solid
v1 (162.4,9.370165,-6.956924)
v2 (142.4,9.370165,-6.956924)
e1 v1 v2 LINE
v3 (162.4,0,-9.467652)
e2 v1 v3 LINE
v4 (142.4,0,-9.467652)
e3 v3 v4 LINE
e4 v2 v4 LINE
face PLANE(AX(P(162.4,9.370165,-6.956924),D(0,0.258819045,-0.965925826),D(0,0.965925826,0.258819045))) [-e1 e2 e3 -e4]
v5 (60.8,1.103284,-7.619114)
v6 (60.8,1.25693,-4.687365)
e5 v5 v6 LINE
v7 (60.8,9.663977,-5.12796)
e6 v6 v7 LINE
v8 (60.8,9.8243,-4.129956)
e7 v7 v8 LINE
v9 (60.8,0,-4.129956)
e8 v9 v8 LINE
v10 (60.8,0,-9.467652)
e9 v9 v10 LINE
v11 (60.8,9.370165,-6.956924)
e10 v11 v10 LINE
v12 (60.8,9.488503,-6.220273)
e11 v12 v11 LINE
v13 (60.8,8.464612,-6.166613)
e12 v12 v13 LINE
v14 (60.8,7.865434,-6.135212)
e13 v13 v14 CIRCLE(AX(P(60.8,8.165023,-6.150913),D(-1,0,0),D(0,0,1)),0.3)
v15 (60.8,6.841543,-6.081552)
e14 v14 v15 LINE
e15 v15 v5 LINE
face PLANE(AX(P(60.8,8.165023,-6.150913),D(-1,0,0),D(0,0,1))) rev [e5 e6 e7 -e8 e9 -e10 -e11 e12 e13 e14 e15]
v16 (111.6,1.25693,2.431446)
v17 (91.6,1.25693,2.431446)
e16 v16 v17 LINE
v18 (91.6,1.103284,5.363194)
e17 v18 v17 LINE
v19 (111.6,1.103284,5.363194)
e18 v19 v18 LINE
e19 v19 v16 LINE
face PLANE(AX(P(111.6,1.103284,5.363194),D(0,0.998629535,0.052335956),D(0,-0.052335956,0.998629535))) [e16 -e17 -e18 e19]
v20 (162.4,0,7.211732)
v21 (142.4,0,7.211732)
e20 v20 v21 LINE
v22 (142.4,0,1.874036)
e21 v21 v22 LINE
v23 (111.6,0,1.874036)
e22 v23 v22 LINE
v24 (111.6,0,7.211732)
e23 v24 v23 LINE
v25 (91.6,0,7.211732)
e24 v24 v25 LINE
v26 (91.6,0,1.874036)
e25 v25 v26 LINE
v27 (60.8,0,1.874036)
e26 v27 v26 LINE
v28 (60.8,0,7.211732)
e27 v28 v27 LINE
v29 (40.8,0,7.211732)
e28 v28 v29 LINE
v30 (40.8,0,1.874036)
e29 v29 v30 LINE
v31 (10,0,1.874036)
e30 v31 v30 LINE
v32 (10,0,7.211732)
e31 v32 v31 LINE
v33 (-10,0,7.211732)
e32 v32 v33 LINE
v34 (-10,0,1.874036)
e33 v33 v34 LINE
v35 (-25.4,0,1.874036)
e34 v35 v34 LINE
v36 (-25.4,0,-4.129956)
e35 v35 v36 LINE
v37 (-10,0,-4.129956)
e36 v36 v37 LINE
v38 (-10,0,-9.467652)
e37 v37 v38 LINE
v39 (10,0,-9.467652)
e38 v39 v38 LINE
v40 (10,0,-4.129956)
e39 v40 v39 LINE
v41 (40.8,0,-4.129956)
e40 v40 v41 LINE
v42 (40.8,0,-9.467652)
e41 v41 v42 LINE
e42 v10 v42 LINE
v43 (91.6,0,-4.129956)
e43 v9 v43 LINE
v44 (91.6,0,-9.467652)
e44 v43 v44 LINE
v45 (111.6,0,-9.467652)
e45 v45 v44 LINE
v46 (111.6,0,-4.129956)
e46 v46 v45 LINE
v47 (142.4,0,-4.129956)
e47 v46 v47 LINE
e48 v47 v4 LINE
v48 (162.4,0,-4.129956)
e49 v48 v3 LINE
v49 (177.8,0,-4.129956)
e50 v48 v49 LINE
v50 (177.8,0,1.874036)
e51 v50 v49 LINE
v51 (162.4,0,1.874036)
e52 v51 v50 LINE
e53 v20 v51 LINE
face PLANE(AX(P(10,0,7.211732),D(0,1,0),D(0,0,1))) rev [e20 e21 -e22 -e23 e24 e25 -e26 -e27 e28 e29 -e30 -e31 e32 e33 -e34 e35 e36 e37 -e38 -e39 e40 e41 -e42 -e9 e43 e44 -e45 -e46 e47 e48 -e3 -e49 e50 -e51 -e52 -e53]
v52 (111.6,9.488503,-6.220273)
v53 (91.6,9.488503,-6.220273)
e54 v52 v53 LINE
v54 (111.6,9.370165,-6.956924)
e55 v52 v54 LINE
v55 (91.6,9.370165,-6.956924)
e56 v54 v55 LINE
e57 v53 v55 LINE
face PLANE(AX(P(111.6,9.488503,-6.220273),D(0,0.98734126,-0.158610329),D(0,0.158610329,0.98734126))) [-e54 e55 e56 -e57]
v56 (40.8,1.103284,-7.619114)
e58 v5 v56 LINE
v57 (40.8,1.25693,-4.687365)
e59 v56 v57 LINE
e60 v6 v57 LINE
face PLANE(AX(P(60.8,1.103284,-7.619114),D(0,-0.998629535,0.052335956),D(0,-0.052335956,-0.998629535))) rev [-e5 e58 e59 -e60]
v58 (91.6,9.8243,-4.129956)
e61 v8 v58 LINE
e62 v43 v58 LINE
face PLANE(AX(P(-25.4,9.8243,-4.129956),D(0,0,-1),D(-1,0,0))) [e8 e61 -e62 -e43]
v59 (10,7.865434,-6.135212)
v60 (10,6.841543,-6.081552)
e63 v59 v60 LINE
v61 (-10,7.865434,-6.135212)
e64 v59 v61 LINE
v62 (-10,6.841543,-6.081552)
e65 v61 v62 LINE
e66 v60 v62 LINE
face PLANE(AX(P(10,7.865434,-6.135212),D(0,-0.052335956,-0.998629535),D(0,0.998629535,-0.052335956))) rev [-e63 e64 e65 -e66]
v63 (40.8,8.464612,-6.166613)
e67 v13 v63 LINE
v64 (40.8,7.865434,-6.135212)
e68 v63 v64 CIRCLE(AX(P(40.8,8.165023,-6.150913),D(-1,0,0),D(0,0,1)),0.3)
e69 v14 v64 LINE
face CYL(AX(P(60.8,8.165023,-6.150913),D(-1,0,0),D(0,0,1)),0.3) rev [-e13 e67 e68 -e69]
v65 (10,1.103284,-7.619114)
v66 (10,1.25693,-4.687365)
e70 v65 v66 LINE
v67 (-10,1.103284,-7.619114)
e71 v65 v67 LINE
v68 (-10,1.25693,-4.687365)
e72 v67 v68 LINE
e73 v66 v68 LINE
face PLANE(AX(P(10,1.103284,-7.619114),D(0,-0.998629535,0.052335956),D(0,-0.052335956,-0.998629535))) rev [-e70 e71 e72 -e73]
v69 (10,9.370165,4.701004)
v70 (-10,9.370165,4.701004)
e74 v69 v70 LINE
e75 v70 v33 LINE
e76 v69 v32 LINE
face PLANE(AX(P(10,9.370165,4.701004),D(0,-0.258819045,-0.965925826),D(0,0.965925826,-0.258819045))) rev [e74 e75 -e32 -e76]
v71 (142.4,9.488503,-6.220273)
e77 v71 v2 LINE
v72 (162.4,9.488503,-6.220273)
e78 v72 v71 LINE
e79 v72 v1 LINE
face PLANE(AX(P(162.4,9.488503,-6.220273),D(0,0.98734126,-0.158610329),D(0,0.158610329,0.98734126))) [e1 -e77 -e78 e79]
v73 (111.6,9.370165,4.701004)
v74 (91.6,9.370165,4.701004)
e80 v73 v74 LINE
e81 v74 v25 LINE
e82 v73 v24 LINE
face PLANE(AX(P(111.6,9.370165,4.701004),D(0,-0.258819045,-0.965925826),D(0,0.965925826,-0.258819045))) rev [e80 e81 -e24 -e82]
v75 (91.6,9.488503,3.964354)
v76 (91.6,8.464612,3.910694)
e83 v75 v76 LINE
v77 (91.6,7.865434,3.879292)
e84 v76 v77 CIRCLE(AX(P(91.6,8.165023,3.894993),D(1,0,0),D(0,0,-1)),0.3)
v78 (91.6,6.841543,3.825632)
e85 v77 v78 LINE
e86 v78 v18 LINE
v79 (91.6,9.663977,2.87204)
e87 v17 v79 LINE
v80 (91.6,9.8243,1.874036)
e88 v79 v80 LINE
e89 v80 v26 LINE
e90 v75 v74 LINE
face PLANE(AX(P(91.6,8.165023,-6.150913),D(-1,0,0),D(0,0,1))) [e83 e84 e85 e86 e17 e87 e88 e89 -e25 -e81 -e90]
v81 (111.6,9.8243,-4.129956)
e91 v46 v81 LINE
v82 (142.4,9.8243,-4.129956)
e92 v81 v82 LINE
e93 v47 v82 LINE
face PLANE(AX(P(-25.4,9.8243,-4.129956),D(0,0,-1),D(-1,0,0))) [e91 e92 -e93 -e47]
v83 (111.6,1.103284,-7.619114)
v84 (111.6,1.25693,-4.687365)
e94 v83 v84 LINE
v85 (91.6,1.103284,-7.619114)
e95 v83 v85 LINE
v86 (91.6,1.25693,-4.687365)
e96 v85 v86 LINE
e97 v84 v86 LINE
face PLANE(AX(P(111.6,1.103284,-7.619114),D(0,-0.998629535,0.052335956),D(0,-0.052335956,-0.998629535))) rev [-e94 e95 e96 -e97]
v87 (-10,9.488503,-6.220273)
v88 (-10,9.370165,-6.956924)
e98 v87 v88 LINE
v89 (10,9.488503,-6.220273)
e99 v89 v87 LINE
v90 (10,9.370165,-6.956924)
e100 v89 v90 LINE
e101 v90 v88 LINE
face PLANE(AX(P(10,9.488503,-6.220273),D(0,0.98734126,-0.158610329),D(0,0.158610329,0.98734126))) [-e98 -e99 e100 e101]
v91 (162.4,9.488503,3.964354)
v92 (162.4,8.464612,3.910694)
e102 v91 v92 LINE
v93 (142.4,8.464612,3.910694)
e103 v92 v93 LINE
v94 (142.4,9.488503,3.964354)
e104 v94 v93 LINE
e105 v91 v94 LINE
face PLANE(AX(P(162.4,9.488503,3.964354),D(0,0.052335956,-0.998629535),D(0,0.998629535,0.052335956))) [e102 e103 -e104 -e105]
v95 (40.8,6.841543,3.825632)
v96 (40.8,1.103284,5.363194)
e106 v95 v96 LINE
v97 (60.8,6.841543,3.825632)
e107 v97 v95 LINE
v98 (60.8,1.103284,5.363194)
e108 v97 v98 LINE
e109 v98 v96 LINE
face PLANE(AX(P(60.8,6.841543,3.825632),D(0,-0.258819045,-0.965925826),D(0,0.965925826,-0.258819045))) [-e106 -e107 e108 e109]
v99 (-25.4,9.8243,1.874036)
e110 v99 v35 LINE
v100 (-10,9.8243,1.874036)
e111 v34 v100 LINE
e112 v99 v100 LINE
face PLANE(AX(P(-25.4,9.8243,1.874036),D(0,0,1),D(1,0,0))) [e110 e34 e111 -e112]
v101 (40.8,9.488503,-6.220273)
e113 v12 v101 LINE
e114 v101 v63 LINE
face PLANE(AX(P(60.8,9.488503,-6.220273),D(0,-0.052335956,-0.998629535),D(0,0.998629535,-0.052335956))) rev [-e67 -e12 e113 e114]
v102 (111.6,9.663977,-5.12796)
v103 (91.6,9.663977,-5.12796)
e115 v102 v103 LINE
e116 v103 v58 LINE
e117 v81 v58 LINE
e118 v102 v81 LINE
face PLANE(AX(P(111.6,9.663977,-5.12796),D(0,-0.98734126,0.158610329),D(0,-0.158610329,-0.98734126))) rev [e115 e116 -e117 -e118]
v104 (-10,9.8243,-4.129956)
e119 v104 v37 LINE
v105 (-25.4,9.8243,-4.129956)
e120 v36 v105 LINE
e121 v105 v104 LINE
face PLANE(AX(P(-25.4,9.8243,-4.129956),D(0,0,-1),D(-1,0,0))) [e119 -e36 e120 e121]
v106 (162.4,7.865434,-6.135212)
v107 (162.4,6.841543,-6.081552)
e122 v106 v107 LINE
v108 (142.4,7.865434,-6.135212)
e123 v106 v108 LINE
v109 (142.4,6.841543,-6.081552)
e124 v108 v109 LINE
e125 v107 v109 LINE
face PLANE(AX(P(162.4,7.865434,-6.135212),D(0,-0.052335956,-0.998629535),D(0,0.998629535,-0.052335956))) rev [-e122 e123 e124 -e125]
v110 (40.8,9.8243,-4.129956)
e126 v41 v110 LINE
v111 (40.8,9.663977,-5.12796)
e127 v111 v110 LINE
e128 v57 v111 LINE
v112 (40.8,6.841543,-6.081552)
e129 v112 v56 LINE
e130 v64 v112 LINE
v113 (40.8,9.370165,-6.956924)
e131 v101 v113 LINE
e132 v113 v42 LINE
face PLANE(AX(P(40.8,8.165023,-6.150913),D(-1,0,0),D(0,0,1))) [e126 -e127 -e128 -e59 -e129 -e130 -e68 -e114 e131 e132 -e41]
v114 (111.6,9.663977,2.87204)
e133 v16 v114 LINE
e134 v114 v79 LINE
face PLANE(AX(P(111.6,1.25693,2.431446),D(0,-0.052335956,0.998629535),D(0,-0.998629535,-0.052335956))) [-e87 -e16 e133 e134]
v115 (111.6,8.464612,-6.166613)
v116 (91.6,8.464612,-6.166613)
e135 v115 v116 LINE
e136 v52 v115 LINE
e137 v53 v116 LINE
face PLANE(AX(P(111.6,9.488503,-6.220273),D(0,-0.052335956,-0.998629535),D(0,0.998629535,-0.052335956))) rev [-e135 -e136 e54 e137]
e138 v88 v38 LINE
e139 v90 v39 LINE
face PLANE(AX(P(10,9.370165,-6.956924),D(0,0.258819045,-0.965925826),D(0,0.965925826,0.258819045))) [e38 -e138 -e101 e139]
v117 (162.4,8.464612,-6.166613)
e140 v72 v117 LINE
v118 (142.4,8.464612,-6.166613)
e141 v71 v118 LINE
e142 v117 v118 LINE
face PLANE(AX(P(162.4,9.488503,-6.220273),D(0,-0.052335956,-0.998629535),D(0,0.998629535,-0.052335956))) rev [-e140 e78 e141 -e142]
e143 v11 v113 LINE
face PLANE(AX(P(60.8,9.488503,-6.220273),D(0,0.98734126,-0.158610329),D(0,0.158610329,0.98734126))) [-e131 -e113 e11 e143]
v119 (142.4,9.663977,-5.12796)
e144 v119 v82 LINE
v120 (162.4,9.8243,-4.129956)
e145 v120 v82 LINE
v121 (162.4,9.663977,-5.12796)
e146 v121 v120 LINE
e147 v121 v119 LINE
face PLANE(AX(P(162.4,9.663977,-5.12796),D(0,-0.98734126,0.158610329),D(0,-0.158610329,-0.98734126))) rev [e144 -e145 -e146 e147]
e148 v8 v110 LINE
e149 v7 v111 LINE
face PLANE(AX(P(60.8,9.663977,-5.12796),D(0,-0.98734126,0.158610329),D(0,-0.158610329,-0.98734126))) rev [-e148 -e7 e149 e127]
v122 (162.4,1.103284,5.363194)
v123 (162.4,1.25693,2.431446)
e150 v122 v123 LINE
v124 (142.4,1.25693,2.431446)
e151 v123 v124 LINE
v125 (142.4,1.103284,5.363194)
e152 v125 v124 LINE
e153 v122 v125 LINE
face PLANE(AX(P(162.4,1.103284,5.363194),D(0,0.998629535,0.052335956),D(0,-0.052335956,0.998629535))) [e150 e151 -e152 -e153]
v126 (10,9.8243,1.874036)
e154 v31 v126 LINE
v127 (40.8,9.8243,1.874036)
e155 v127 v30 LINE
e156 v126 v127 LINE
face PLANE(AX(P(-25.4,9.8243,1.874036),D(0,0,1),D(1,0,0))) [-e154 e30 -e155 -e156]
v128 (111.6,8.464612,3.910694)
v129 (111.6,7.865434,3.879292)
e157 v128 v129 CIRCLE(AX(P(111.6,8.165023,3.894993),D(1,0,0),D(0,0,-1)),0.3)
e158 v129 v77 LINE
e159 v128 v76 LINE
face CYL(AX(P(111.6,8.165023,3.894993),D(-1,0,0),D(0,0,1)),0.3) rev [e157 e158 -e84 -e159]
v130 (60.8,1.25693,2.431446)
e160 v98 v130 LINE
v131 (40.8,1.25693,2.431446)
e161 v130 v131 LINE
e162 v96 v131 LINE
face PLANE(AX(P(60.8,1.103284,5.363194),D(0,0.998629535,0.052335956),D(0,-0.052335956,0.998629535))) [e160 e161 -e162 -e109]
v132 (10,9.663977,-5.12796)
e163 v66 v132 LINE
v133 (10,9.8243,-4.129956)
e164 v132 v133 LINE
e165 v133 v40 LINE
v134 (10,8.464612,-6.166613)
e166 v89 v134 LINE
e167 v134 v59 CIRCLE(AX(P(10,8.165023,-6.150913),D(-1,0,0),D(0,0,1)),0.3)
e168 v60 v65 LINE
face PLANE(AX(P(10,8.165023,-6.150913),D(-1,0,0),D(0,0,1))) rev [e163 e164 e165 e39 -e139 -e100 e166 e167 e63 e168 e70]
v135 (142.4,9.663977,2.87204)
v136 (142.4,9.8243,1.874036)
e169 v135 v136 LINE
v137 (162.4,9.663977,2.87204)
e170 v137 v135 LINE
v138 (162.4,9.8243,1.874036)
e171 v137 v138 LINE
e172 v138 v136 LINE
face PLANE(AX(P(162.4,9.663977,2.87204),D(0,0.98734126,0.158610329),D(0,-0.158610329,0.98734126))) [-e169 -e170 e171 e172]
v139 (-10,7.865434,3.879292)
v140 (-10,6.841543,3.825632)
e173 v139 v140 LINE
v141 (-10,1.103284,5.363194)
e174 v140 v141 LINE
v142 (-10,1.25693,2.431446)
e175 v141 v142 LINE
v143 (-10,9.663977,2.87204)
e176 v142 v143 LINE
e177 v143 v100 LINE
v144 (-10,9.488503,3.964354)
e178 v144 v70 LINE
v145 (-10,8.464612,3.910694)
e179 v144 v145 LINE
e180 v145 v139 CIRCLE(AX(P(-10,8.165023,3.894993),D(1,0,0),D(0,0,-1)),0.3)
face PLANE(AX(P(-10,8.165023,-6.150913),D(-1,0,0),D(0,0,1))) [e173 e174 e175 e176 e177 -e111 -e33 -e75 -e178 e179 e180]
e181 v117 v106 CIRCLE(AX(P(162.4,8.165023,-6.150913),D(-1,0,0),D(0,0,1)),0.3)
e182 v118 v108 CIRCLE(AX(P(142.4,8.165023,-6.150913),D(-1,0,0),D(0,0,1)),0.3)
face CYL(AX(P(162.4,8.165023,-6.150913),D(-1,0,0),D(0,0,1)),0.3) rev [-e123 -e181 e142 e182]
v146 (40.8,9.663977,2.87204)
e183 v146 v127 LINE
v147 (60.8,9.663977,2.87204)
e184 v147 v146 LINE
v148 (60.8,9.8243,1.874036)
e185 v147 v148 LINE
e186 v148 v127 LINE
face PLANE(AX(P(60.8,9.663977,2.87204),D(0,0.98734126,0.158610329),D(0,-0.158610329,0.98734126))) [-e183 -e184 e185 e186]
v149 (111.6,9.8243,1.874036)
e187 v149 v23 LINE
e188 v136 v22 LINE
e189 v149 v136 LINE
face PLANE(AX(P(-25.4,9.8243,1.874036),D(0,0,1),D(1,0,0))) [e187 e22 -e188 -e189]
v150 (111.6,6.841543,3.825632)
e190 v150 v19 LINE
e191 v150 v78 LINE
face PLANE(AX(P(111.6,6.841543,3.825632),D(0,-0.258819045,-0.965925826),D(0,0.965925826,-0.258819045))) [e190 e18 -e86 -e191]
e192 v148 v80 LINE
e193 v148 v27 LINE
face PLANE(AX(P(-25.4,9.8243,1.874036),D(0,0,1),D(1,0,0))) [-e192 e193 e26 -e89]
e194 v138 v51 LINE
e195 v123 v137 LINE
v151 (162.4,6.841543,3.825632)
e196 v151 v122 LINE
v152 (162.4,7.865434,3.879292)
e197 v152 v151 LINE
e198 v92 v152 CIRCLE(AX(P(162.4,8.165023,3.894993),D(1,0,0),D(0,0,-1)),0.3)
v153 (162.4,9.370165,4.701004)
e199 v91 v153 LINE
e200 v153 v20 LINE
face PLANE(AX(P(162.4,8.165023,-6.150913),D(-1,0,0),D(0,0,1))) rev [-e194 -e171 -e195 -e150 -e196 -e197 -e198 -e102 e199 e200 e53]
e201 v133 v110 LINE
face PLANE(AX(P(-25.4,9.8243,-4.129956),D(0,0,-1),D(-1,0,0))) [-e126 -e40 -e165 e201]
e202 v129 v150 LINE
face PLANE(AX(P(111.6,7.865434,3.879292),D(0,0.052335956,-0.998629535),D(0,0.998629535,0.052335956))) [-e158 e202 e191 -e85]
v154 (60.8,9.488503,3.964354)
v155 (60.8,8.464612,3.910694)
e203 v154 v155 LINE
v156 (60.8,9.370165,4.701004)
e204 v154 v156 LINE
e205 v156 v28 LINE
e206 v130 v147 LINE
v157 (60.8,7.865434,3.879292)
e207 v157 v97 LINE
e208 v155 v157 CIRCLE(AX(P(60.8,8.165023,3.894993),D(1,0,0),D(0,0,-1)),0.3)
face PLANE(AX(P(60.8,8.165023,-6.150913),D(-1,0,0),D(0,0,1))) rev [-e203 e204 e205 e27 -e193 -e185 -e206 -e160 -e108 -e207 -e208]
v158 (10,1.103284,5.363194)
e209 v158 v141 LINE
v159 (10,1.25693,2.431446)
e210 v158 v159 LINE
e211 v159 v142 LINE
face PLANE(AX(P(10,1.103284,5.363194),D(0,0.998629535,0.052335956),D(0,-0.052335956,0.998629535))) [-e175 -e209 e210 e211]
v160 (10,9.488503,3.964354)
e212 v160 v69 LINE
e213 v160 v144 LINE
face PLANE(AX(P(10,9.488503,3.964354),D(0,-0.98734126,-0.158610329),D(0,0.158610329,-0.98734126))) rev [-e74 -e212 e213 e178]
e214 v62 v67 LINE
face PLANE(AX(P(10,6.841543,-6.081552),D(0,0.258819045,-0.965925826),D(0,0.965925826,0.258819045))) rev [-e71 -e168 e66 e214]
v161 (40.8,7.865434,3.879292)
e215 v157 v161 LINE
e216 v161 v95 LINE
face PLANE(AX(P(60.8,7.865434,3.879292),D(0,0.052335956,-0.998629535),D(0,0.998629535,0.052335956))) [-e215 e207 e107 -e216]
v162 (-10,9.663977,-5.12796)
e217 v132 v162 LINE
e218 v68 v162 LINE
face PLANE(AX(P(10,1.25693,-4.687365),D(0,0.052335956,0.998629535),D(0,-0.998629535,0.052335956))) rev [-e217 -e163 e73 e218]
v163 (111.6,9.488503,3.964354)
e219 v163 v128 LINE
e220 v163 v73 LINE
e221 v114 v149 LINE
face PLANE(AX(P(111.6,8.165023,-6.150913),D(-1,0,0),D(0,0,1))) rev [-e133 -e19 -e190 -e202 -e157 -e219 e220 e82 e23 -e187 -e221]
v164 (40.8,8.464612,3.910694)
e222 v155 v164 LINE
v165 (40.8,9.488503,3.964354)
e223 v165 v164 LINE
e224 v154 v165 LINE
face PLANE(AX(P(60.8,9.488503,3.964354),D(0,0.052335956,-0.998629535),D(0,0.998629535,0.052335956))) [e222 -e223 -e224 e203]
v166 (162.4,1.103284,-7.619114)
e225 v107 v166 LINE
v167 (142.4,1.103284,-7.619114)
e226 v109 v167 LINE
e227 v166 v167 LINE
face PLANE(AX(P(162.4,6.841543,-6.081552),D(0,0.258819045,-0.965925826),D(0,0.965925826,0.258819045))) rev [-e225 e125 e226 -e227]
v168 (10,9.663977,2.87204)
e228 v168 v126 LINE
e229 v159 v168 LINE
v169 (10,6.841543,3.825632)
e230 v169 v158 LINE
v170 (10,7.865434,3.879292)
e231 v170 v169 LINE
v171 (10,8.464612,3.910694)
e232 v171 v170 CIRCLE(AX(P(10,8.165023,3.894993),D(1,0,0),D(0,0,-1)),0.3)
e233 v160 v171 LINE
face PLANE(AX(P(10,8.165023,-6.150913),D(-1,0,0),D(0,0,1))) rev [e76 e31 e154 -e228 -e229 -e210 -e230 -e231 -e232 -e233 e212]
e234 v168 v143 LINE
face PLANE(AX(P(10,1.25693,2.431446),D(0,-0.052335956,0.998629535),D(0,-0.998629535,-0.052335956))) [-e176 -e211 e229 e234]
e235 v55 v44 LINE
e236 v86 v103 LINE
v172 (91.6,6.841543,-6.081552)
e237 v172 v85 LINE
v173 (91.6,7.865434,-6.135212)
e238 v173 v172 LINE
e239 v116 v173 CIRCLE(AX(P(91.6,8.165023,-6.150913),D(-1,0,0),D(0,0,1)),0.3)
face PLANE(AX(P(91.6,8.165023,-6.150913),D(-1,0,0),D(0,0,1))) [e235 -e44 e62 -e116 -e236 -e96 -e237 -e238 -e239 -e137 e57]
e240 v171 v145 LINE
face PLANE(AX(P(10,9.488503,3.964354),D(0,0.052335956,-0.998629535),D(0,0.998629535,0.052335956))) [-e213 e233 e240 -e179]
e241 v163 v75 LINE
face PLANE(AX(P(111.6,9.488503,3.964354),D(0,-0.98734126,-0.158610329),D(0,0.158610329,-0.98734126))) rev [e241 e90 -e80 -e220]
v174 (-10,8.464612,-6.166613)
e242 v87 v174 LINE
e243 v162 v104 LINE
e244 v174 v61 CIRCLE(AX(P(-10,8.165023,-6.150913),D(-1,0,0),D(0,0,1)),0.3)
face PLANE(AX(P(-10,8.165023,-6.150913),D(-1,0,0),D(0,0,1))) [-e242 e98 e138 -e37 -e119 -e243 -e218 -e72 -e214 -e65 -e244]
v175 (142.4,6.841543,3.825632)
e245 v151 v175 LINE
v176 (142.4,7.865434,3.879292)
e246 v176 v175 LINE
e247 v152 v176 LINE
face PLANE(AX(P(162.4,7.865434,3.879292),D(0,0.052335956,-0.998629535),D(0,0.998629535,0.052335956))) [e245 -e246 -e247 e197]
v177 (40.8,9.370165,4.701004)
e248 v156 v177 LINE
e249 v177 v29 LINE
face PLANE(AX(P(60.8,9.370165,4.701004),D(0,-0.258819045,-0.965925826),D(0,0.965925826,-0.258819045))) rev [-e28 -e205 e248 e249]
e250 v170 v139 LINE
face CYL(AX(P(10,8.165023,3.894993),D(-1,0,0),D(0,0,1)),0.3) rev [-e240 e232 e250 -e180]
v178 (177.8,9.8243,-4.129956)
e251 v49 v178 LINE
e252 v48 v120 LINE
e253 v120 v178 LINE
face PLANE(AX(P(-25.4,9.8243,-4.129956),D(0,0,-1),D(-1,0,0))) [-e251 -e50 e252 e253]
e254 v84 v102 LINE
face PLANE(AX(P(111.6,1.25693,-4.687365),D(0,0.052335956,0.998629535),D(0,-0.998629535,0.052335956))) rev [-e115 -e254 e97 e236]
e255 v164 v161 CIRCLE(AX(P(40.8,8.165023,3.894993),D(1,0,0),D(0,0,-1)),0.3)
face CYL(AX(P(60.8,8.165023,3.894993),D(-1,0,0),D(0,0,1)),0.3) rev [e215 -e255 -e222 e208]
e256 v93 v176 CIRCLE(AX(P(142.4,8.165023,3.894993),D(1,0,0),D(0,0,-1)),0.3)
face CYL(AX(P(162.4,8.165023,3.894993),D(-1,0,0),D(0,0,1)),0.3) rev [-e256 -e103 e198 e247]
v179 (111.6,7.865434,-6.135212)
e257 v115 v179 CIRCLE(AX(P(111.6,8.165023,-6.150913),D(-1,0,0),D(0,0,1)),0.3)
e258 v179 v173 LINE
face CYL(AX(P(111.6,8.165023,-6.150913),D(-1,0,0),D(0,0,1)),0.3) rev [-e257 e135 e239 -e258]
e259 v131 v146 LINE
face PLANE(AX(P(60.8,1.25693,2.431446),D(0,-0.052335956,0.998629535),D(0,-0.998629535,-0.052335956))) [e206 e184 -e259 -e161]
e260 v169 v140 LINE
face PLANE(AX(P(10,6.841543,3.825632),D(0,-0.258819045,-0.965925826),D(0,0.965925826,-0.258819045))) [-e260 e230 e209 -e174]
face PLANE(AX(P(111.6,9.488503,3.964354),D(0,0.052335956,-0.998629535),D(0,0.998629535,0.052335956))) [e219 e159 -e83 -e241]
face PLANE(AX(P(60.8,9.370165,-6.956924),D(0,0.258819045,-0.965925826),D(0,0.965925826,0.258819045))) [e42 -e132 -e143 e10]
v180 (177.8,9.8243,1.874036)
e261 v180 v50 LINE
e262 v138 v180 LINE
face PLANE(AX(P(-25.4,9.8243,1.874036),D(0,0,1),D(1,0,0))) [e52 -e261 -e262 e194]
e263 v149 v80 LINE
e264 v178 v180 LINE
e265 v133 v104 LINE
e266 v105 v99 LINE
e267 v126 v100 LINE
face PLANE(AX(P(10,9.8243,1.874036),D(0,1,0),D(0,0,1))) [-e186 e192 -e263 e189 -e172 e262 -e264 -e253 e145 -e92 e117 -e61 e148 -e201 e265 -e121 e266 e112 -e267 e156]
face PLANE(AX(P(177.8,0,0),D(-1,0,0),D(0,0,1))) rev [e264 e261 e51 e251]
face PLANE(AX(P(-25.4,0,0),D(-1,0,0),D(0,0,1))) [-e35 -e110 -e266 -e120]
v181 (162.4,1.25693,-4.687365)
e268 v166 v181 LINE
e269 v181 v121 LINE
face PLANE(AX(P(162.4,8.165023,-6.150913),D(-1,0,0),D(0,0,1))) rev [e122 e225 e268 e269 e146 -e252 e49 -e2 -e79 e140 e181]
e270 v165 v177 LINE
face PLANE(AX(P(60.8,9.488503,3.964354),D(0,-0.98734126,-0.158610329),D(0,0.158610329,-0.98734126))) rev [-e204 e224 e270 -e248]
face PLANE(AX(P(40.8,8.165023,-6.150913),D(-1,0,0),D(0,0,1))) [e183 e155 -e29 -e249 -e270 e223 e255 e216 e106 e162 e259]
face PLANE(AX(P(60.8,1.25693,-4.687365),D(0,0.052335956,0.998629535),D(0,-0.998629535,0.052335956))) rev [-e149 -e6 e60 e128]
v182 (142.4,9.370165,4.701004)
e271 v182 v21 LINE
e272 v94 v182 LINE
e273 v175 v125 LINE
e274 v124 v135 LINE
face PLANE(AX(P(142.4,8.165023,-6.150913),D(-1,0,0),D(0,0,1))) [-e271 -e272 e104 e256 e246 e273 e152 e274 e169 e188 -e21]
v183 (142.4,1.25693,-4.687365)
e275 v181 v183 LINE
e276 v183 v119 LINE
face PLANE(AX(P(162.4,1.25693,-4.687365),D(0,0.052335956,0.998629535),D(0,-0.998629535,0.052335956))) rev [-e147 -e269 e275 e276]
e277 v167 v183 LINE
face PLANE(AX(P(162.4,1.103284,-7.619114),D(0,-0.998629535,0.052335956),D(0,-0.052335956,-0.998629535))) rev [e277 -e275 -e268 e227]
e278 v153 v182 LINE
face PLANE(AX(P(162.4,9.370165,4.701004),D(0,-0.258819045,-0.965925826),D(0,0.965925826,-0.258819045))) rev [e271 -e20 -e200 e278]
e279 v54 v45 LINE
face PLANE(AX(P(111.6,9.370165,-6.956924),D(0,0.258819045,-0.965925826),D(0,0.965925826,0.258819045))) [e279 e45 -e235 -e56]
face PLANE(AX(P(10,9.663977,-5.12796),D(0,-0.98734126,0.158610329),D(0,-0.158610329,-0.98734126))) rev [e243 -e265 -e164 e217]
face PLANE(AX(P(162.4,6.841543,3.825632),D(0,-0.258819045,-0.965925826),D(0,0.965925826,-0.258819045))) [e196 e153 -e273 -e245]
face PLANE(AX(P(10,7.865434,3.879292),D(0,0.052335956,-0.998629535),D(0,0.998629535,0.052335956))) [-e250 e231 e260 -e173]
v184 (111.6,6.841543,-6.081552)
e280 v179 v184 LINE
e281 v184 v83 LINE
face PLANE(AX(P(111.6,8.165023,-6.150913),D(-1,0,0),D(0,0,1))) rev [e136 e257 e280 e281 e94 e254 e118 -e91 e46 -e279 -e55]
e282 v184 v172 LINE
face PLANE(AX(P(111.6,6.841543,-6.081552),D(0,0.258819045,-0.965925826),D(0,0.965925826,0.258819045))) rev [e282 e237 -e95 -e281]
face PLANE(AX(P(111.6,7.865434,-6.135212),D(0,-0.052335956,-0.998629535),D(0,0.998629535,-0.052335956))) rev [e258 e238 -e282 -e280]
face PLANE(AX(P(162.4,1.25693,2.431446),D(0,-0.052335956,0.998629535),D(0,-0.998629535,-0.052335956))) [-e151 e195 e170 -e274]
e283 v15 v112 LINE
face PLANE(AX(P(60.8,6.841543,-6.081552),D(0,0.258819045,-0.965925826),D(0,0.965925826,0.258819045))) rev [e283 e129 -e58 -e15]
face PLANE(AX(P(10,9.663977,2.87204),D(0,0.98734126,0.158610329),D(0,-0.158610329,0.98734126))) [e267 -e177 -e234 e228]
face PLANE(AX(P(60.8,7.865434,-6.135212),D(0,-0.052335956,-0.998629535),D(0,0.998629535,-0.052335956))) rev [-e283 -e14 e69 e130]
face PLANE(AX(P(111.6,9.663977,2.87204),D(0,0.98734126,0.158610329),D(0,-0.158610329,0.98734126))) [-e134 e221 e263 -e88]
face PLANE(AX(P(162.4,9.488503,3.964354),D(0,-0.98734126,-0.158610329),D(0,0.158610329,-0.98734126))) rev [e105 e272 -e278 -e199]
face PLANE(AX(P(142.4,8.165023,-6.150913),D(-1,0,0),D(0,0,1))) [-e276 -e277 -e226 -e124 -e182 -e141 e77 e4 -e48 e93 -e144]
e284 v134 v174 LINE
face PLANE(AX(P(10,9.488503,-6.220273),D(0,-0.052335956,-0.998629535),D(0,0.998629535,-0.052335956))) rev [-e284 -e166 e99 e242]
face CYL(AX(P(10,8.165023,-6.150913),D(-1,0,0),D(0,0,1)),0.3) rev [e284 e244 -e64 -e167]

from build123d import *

# Parameters (mm, degrees)
CLIP_1_DEPTH           = 10
CENTER_BEAM_DEPTH      = 177.8
CENTER_BEAM_DEPTH_BACK = 25.4
SKETCH4_W              = 6.003992509
SKETCH4_H              = 9.824299843
LPATTERN1_COUNT        = 4
LPATTERN1_PITCH        = 50.8


with BuildPart() as part:
    # Sketch1 → Clip #1 (new, symmetric)
    with BuildSketch(Plane(origin=(0, 0, 0), x_dir=(0, 0, -1), z_dir=(1, 0, 0))):
        with BuildLine():
            Line((6.081551938, 6.841542851), (7.61911384, 1.103283712))
            Line((7.61911384, 1.103283712), (4.687365208, 1.256930148))
            Line((4.687365208, 1.256930148), (5.127959845, 9.663976652))
            Line((5.127959845, 9.663976652), (4.1299561, 9.824299843))
            Line((4.1299561, 9.824299843), (-1.874036409, 9.824299843))
            Line((-1.874036409, 9.824299843), (-2.872040155, 9.663976652))
            Line((-2.872040155, 9.663976652), (-2.431445517, 1.256930148))
            Line((-2.431445517, 1.256930148), (-5.36319415, 1.103283712))
            Line((-5.36319415, 1.103283712), (-3.825632248, 6.841542851))
            Line((-3.825632248, 6.841542851), (-3.879292118, 7.86543416))
            ThreePointArc((-3.879292118, 7.86543416), (-4.194581765, 8.149322234), (-3.910693691, 8.464611881))
            Line((-3.910693691, 8.464611881), (-3.964353561, 9.488503191))
            Line((-3.964353561, 9.488503191), (-4.701004321, 9.370164756))
            Line((-4.701004321, 9.370164756), (-7.2117324, 0))
            Line((-7.2117324, 0), (-2.365572599, 0))
            Line((-2.365572599, 0), (4.62149229, 0))
            Line((4.62149229, 0), (9.46765209, 0))
            Line((9.46765209, 0), (6.956924011, 9.370164756))
            Line((6.956924011, 9.370164756), (6.220273251, 9.488503191))
            Line((6.220273251, 9.488503191), (6.166613382, 8.464611881))
            ThreePointArc((6.166613382, 8.464611881), (6.450501455, 8.149322234), (6.135211808, 7.86543416))
            Line((6.135211808, 7.86543416), (6.081551938, 6.841542851))
        make_face()
    clip_1 = extrude(amount=CLIP_1_DEPTH, both=True)

    # Sketch4 → Center beam (add, two sides: drawn at the far end of the back side and taken through both)
    with BuildSketch(Plane(origin=(0, 0, 0), x_dir=(0, 0, -1), z_dir=(1, 0, 0)).offset(-CENTER_BEAM_DEPTH_BACK)):
        with Locations((1.127959845, 4.912149922)):
            Rectangle(SKETCH4_W, SKETCH4_H)
    extrude(amount=CENTER_BEAM_DEPTH + CENTER_BEAM_DEPTH_BACK)

    # LPattern1: Clip #1 ×4
    with Locations(*[(i * LPATTERN1_PITCH, 0, 0) for i in range(1, LPATTERN1_COUNT)]):
        add(clip_1)


solid = part.part
